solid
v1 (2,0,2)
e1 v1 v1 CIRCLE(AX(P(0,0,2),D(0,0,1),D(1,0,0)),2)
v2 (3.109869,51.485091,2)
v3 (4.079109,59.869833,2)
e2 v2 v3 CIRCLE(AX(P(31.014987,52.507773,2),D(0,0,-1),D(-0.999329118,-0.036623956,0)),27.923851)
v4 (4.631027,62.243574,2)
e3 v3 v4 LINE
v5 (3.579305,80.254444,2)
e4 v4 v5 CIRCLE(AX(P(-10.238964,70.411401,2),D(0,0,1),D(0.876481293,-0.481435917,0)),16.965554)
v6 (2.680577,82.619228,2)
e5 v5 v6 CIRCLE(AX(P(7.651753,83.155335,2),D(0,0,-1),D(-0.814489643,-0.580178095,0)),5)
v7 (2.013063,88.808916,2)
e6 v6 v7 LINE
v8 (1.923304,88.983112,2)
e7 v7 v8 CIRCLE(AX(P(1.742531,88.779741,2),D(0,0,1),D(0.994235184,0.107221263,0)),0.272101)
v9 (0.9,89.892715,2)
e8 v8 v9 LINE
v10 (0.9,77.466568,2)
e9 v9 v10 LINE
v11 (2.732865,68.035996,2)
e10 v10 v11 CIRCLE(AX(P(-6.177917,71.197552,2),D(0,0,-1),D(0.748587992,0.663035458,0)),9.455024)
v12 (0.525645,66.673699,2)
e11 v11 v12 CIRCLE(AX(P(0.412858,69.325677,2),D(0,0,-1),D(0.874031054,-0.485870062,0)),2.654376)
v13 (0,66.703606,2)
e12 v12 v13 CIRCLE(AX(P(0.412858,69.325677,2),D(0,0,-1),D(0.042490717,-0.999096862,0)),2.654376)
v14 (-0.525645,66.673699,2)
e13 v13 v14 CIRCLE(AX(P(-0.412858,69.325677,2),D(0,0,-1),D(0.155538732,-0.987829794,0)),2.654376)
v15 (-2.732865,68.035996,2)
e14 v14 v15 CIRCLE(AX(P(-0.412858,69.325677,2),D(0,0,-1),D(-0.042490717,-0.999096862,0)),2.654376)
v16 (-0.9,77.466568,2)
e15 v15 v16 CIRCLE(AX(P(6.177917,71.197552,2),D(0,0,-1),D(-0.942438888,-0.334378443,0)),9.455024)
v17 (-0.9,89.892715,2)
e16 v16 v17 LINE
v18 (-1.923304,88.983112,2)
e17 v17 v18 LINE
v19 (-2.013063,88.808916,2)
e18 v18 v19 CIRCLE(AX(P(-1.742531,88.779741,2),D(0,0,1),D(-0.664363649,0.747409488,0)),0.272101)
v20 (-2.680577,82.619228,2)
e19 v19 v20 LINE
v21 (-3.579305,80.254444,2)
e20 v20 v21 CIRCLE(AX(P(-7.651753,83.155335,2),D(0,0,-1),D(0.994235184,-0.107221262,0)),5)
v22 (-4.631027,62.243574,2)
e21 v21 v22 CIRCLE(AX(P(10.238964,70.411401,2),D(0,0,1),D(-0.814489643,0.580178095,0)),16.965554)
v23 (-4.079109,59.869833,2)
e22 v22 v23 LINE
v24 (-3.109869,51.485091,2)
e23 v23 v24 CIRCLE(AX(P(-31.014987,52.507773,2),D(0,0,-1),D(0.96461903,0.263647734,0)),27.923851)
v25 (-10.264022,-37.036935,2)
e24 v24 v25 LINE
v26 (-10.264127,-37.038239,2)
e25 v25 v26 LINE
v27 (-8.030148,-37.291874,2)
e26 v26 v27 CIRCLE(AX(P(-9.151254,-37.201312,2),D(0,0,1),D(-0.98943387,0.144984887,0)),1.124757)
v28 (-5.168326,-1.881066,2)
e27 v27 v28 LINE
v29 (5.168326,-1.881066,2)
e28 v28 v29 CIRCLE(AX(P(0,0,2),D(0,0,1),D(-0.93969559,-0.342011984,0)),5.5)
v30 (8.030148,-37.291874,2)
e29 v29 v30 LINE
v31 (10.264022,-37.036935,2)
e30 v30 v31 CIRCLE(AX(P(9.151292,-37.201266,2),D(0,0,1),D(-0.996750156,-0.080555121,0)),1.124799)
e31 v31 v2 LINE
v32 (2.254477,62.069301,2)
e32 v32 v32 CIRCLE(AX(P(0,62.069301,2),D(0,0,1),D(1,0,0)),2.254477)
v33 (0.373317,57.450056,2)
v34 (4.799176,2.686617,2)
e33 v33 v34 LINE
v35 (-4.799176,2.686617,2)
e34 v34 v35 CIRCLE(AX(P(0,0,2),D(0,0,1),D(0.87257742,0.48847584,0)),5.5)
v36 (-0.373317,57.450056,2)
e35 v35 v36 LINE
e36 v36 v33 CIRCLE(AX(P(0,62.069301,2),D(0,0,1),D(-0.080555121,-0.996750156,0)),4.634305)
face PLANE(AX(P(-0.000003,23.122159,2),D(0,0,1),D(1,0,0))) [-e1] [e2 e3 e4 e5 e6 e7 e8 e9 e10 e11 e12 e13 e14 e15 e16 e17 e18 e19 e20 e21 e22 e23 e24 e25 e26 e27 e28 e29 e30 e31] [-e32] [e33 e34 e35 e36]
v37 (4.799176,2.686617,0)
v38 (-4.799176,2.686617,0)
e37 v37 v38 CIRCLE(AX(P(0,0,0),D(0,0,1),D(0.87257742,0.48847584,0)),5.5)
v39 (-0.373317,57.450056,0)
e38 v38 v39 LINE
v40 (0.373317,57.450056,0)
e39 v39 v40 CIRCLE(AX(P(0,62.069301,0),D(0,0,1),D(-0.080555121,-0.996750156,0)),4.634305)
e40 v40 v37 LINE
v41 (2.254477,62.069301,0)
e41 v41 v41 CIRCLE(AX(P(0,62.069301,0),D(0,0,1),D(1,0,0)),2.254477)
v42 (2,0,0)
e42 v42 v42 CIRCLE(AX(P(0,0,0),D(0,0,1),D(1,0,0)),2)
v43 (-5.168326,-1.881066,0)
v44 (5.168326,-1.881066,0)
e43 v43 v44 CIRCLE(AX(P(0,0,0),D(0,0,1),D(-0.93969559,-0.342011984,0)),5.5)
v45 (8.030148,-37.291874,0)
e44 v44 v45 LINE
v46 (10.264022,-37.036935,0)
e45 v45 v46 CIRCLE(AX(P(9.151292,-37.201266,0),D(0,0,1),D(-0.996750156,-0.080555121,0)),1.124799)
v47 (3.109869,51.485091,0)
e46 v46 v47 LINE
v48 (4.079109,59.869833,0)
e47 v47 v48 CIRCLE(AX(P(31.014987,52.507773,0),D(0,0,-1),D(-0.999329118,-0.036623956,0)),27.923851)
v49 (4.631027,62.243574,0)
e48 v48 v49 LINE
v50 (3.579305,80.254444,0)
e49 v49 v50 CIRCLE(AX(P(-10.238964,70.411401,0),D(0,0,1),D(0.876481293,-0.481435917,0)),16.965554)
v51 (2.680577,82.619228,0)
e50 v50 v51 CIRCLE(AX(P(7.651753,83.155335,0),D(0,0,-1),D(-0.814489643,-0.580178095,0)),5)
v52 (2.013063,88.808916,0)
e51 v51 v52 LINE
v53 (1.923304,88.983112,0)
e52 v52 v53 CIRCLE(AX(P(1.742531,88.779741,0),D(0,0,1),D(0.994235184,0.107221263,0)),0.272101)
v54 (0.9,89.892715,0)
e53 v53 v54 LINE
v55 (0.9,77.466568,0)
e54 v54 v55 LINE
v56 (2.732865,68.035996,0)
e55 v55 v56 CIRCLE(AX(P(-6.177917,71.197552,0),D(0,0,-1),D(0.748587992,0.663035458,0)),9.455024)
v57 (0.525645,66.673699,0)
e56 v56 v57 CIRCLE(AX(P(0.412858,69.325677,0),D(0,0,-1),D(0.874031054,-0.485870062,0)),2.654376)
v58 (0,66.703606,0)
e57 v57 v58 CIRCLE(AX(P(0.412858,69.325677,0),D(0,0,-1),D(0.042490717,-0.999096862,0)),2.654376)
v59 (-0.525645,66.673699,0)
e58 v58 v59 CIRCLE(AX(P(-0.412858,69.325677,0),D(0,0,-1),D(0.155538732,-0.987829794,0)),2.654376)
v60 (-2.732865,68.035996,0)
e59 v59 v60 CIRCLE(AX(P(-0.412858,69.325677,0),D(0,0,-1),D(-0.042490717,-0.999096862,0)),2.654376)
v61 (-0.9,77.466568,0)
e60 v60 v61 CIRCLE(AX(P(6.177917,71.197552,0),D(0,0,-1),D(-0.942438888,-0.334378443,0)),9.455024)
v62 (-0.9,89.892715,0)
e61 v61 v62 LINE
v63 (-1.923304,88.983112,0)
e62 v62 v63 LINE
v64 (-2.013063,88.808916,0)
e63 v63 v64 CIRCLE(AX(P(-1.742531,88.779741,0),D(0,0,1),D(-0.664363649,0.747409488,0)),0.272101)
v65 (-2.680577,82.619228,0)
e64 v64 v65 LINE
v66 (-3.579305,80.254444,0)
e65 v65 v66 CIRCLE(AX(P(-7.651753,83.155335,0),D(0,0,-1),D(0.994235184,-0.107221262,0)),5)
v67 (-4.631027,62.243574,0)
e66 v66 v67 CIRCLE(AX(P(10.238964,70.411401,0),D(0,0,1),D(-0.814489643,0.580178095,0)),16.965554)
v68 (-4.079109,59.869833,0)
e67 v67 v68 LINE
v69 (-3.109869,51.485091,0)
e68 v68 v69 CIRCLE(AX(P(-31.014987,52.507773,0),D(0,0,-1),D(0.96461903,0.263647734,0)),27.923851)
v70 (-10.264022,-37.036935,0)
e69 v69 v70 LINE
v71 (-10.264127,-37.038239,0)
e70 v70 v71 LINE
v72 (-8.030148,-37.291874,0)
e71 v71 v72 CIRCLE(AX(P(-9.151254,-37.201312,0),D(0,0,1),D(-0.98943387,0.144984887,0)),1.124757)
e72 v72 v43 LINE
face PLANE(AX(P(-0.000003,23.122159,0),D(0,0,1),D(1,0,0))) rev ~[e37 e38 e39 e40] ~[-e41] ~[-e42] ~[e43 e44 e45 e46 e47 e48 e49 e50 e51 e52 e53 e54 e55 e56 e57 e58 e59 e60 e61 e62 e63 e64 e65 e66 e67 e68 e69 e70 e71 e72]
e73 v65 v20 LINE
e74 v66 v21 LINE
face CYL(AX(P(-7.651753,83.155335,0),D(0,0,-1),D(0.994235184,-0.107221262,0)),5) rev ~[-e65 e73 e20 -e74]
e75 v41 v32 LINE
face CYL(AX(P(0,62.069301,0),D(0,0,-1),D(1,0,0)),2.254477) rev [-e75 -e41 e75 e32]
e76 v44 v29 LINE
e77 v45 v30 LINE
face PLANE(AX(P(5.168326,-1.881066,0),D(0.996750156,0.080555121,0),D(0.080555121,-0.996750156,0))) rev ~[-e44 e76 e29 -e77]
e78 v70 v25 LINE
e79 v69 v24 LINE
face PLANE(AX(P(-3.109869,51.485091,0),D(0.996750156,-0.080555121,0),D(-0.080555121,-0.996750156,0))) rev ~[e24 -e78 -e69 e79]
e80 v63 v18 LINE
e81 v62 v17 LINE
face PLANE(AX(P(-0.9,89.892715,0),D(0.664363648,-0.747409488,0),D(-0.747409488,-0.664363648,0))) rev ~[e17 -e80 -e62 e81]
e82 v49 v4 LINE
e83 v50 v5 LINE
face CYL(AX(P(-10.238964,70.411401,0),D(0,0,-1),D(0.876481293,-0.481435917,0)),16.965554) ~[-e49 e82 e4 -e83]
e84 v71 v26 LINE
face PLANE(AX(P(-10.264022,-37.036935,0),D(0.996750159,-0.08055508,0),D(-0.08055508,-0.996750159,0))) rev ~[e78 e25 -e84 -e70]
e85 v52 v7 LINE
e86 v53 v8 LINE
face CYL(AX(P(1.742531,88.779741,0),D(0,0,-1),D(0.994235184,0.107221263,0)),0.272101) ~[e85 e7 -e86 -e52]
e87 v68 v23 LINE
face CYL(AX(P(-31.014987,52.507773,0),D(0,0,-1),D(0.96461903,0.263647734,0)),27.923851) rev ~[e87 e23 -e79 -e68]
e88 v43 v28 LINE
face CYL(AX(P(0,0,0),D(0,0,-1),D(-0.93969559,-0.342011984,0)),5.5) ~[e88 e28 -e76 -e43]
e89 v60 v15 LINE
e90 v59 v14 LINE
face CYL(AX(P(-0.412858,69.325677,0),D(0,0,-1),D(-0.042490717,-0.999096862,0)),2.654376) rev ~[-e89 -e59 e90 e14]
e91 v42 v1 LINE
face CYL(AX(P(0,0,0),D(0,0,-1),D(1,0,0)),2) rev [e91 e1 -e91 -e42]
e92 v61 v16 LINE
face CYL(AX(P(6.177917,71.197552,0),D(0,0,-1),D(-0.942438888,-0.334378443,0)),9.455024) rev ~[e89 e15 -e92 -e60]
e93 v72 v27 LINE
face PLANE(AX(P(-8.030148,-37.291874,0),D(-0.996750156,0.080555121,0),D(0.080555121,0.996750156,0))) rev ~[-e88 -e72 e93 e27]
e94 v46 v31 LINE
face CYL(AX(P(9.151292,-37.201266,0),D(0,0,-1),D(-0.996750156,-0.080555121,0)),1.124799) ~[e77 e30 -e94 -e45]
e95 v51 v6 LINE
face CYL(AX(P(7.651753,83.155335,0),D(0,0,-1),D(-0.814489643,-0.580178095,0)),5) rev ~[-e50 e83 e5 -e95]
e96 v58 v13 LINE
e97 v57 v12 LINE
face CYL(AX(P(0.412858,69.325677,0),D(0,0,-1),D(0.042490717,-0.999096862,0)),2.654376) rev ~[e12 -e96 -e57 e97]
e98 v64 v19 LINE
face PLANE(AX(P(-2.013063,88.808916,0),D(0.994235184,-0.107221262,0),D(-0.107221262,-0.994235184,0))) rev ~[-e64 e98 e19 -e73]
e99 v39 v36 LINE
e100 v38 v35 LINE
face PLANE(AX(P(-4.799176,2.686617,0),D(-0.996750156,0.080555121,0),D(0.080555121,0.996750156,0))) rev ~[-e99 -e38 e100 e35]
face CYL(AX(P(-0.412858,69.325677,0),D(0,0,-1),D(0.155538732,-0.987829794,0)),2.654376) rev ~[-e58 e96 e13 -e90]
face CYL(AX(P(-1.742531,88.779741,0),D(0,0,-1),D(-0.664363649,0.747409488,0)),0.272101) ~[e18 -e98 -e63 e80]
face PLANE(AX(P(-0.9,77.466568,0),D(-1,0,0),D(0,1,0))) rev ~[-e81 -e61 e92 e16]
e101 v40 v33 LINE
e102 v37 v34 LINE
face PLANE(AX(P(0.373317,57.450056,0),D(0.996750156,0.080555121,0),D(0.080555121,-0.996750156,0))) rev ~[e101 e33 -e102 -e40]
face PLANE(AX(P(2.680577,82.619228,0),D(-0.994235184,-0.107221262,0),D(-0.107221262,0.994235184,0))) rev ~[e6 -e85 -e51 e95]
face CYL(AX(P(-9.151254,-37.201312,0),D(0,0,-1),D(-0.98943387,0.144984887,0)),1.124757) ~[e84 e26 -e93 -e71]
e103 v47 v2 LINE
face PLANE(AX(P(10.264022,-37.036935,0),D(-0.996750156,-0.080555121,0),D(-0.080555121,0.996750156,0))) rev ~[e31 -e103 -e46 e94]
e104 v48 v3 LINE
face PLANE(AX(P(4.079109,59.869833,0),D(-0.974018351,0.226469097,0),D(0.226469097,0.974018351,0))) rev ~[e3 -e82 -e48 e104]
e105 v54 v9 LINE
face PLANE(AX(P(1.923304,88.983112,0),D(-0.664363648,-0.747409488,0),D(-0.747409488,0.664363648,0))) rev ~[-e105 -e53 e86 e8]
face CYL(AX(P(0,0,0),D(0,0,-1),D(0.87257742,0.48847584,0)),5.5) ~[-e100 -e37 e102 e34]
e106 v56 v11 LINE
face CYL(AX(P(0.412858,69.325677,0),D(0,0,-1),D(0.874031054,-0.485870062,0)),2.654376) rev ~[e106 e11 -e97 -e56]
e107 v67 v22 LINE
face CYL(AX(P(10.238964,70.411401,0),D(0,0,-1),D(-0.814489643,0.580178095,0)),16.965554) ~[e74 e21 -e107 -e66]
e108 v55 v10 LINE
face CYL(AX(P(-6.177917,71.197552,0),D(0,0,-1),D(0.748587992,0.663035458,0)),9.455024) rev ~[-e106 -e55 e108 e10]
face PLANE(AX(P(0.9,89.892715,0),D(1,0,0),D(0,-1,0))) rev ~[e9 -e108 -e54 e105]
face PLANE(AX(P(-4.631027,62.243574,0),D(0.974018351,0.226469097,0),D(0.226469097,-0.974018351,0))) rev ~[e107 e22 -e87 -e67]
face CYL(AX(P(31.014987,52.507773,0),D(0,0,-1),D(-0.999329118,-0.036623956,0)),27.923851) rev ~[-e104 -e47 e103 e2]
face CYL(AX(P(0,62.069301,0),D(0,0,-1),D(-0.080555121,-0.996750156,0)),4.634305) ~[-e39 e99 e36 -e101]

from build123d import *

# Parameters (mm, degrees)
F0_R     = 2
F0_R_2   = 2.2544770367
F1_DEPTH = 2


# Not quite as in the source:
# - ends of sketch curves that miss each other by under 0.0002 mm in the source are joined


with BuildPart() as f1:
    # F0 (on Top) → F1 (new body)
    with BuildSketch(Plane.XY):
        with BuildLine():
            ThreePointArc((-5.1683257468, -1.8810659147), (0, -5.5), (5.1683257468, -1.8810659147))
            Line((5.1683257468, -1.8810659147), (8.0301481547, -37.2918741238))
            ThreePointArc((8.0301481547, -37.2918741238), (9.2788304803, -38.3188106152), (10.2640215975, -37.0369352038))
            Line((10.2640215975, -37.0369352038), (3.1098692343, 51.4850906656))
            ThreePointArc((3.1098692343, 51.4850906656), (3.2758505583, 55.7142948477), (4.0791085727, 59.8698326439))
            Line((4.0791085727, 59.8698326439), (4.6310273864, 62.2435739623))
            ThreePointArc((4.6310273864, 62.2435739623), (6.6977396132, 71.4003991777), (3.5793046773, 80.2544440729))
            ThreePointArc((3.5793046773, 80.2544440729), (2.9779070013, 81.3790562482), (2.6805769718, 82.6192282376))
            Line((2.6805769718, 82.6192282376), (2.0130627379, 88.8089160456))
            ThreePointArc((2.0130627379, 88.8089160456), (1.9844093078, 88.9043745509), (1.9233044553, 88.9831117232))
            Line((1.9233044553, 88.9831117232), (0.9, 89.8927152157))
            Line((0.9, 89.8927152157), (0.9, 77.4665676321))
            ThreePointArc((0.9, 77.4665676321), (3.1034376701, 73.0014155649), (2.7328648238, 68.0359955106))
            ThreePointArc((2.7328648238, 68.0359955106), (1.8069828059, 67.0668885057), (0.5256445201, 66.6736988627))
            ThreePointArc((0.5256445201, 66.6736988627), (0.2620789214, 66.6755874914), (0, 66.7036058899))
            ThreePointArc((0, 66.7036058899), (-0.2620789214, 66.6755874914), (-0.5256445201, 66.6736988627))
            ThreePointArc((-0.5256445201, 66.6736988627), (-1.8069828059, 67.0668885057), (-2.7328648238, 68.0359955106))
            ThreePointArc((-2.7328648238, 68.0359955106), (-3.1034376701, 73.0014155649), (-0.9, 77.4665676321))
            Line((-0.9, 77.4665676321), (-0.9, 89.8927152157))
            Line((-0.9, 89.8927152157), (-1.9233044553, 88.9831117232))
            ThreePointArc((-1.9233044553, 88.9831117232), (-1.9844093078, 88.9043745509), (-2.0130627379, 88.8089160456))
            Line((-2.0130627379, 88.8089160456), (-2.6805769718, 82.6192282376))
            ThreePointArc((-2.6805769718, 82.6192282376), (-2.9779070013, 81.3790562482), (-3.5793046773, 80.2544440729))
            ThreePointArc((-3.5793046773, 80.2544440729), (-6.6977396132, 71.4003991777), (-4.6310273864, 62.2435739623))
            Line((-4.6310273864, 62.2435739623), (-4.0791085727, 59.8698326439))
            ThreePointArc((-4.0791085727, 59.8698326439), (-3.2758505583, 55.7142948477), (-3.1098692343, 51.4850906656))
            Line((-3.1098692343, 51.4850906656), (-10.2640215975, -37.0369352038))
            Line((-10.2640215975, -37.0369352038), (-10.264126962, -37.0382389339))
            ThreePointArc((-10.264126962, -37.0382389339), (-9.2781820506, -38.3188844261), (-8.0301481547, -37.2918741238))
            Line((-8.0301481547, -37.2918741238), (-5.1683257468, -1.8810659147))
        make_face()
        Circle(F0_R, mode=Mode.SUBTRACT)
        with BuildLine():
            ThreePointArc((4.7991758084, 2.6866171219), (0, 5.5), (-4.7991758084, 2.6866171219))
            Line((-4.7991758084, 2.6866171219), (-0.3733170252, 57.4500560059))
            ThreePointArc((-0.3733170252, 57.4500560059), (0, 57.4349952343), (0.3733170252, 57.4500560059))
            Line((0.3733170252, 57.4500560059), (4.7991758084, 2.6866171219))
        make_face(mode=Mode.SUBTRACT)
        with Locations((0, 62.0693005621)):
            Circle(F0_R_2, mode=Mode.SUBTRACT)
    extrude(amount=F1_DEPTH)


solid = f1.part
